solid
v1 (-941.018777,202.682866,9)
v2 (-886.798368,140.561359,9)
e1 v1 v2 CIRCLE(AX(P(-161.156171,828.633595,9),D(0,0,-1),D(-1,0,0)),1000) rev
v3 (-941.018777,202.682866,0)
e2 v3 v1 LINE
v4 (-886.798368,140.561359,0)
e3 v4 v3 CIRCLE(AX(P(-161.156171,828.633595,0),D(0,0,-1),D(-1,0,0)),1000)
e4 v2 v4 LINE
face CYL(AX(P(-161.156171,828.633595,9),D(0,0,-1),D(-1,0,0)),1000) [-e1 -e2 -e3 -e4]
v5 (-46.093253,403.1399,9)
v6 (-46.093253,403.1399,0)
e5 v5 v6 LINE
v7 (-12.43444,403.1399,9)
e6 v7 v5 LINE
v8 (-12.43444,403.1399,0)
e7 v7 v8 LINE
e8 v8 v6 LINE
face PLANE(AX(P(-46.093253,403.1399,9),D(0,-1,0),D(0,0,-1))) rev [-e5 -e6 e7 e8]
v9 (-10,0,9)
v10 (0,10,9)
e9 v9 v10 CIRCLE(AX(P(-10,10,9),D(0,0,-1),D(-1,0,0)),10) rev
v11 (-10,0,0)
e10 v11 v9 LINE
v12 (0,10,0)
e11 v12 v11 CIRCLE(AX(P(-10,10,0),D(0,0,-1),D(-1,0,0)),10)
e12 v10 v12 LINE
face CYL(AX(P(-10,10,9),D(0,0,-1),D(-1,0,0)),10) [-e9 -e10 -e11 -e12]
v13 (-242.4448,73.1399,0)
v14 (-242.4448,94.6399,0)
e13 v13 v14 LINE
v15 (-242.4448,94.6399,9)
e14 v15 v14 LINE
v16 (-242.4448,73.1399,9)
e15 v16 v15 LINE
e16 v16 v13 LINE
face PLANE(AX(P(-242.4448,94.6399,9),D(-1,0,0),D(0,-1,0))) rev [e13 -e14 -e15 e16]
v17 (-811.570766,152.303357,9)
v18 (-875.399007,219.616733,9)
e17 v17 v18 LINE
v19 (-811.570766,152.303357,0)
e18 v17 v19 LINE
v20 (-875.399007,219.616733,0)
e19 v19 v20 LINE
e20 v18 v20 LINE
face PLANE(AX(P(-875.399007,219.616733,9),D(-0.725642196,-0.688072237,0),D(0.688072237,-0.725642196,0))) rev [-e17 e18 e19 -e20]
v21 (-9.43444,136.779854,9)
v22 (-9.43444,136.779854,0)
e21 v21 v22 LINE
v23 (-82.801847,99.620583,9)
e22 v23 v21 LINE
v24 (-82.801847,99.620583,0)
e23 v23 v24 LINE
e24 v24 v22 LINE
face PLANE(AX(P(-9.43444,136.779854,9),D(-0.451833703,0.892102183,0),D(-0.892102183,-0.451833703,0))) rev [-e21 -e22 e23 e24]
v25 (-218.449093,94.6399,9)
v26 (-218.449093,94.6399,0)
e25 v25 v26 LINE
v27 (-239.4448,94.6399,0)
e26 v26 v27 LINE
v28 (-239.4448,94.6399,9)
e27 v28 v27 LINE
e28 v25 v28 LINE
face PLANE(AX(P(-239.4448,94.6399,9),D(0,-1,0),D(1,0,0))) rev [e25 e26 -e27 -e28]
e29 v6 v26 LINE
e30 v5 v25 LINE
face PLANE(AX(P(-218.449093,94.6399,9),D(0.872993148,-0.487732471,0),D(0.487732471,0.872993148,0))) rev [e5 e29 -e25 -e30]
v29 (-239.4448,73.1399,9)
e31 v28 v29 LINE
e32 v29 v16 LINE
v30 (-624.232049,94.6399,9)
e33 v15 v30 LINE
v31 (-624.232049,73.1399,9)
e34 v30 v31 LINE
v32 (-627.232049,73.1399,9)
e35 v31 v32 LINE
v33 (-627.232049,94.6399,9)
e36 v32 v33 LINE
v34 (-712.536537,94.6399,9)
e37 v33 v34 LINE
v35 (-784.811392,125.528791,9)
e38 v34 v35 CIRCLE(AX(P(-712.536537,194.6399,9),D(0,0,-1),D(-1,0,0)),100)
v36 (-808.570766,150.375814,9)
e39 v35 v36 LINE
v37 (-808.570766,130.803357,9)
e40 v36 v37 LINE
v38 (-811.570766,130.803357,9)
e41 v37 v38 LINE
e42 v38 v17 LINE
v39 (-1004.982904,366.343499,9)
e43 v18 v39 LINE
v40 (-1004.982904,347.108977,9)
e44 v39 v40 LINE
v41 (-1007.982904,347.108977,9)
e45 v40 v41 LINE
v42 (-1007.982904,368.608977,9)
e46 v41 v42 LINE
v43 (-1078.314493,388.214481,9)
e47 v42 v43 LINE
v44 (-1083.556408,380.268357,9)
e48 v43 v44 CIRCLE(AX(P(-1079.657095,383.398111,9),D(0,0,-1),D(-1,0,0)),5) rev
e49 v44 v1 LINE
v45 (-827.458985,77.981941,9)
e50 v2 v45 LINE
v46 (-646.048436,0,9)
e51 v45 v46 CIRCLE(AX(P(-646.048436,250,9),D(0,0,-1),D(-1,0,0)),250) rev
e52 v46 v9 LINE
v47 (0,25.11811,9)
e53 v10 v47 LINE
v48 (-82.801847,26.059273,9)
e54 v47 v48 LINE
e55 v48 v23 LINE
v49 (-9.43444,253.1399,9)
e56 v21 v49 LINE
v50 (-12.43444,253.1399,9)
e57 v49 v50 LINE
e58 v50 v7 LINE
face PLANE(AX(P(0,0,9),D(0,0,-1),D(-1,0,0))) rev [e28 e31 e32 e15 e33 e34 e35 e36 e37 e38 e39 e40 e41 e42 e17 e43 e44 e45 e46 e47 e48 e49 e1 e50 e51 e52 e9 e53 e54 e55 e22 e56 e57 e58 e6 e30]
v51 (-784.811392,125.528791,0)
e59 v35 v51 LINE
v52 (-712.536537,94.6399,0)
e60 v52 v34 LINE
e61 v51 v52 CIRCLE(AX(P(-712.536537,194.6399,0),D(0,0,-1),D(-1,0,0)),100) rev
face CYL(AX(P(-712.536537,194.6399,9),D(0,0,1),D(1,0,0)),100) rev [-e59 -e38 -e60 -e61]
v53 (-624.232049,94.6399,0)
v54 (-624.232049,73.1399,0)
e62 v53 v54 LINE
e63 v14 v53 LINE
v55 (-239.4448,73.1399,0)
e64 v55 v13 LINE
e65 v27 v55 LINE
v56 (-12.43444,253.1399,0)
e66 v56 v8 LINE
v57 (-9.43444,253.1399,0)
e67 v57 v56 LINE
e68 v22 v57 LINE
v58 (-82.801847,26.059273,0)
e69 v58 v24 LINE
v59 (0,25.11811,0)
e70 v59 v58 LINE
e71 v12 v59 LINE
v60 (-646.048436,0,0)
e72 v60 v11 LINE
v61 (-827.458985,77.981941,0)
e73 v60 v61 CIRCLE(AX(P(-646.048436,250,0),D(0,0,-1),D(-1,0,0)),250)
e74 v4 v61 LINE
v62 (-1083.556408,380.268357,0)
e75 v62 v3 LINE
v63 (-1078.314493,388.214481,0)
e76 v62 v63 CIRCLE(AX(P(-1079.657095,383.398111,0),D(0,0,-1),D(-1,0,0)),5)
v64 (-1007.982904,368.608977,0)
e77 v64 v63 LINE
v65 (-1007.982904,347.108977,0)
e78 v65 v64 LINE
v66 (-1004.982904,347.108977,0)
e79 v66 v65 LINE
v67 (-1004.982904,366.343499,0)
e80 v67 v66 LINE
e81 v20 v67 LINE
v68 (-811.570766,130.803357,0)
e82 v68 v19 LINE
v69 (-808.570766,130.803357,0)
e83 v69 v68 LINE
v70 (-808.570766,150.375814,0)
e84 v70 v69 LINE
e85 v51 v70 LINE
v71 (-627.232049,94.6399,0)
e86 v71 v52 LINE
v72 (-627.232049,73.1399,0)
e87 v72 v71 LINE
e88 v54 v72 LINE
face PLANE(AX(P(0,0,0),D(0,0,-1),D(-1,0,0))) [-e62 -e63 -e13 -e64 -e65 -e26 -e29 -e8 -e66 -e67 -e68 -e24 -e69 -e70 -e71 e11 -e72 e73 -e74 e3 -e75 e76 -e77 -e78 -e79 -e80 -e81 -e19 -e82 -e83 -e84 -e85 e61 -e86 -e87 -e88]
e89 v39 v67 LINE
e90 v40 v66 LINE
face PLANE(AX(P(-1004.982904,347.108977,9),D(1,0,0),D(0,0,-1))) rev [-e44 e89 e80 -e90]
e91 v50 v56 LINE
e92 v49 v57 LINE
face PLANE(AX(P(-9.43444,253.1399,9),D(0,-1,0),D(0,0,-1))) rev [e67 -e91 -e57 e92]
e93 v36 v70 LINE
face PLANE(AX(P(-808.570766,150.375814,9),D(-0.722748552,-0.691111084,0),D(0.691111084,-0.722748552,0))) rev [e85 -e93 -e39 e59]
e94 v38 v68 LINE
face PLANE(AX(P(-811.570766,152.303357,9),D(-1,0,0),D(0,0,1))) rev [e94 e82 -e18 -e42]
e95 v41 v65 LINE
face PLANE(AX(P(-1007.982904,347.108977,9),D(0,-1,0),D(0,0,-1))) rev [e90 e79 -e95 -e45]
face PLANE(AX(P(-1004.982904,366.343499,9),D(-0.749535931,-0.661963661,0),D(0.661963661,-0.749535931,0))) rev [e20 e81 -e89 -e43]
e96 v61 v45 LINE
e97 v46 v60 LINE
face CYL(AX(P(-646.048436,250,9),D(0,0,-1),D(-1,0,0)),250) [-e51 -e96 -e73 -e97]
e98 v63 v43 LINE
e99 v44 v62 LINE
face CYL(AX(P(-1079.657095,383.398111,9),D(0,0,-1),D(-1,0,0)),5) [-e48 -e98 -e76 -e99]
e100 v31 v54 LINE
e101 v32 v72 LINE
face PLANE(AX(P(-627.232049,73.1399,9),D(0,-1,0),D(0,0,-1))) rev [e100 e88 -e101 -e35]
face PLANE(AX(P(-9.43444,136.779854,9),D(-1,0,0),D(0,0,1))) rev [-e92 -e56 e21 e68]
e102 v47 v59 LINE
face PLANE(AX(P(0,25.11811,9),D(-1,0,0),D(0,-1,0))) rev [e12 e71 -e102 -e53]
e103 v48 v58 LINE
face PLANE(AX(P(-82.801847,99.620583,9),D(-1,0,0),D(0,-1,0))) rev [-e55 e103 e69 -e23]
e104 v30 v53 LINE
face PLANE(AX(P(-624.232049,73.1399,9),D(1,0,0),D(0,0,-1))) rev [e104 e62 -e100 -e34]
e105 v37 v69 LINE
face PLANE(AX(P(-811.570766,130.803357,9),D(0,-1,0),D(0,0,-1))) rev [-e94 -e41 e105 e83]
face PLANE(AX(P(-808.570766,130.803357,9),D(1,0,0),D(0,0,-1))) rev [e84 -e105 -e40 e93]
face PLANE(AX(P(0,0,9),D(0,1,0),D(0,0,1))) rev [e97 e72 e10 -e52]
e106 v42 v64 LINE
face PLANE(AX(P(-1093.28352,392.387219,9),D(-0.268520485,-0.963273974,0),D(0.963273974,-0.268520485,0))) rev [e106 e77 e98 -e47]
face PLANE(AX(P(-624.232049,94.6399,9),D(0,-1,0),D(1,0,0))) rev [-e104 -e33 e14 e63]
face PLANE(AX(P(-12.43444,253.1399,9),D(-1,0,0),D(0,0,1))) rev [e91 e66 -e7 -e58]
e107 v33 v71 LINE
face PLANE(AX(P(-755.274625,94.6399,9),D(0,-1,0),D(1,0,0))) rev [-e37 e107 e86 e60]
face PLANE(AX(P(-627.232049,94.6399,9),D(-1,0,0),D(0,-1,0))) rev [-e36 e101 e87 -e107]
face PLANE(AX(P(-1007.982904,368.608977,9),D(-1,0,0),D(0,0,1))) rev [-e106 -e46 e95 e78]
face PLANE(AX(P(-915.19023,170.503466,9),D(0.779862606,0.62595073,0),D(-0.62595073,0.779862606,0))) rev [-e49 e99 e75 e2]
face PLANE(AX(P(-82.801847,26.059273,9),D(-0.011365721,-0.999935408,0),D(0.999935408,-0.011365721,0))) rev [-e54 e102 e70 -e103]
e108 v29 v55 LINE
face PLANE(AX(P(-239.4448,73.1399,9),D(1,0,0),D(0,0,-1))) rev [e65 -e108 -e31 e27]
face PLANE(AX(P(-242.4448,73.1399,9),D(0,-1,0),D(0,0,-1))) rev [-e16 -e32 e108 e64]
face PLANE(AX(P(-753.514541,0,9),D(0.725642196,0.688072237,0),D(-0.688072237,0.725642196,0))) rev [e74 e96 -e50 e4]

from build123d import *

# Parameters (mm, degrees)
BOSS_EXTRU_1_DEPTH = 9
CONG_1_R           = 1000
CONG_2_R           = 250
CONG_4_R           = 10
CONG_5_R           = 5
CONG_6_R           = 100


with BuildPart() as part:
    # Esquisse2 → Boss.-Extru.1 (new body)
    with BuildSketch(Plane.XY):
        Polygon((0, 0), (-753.514541491, 0), (-915.190229508, 170.50346618), (-1093.283519558, 392.387219436), (-1007.982904338, 368.608976512), (-1007.982904338, 347.108976512), (-1004.982904338, 347.108976512), (-1004.982904338, 366.343498655), (-875.399006988, 219.616732713), (-811.570765603, 152.303356597), (-811.570765603, 130.803356597), (-808.570765603, 130.803356597), (-808.570765603, 150.375814407), (-755.274625166, 94.639899826), (-627.232048759, 94.639899826), (-627.232048759, 73.139899826), (-624.232048759, 73.139899826), (-624.232048759, 94.639899826), (-242.444799847, 94.639899826), (-242.444799847, 73.139899826), (-239.444799847, 73.139899826), (-239.444799847, 94.639899826), (-218.449092799, 94.639899826), (-46.093252688, 403.139899826), (-12.434439882, 403.139899826), (-12.434439882, 253.139899826), (-9.434439882, 253.139899826), (-9.434439882, 136.779854294), (-82.801847324, 99.620582608), (-82.801847324, 26.059273195), (0, 25.118109707), align=None)
    extrude(amount=BOSS_EXTRU_1_DEPTH)

    # Congé1
    # the kernel refuses this fillet: 1000 mm, written as the material it takes off along each edge
    with BuildSketch(Plane(origin=(-915.190229508, 170.50346618, -103.157271439), x_dir=(0.6880722367162745, -0.7256421963063223, 0), z_dir=(0, 0, 1))) as cong_1_piece_1:
        with BuildLine():
            CenterArc((CONG_1_R * 0.0412629085755, CONG_1_R), CONG_1_R, 265.274299796, 4.725700204)
            Line((-CONG_1_R * 0.0411226366703, CONG_1_R * 0.00339946722142), (0, 0))
            Line((0, 0), (CONG_1_R * 0.0412629085755, 0))
        make_face()
    extrude(amount=215.314542878, mode=Mode.SUBTRACT)

    # Congé2
    cong_2_edges = [part.edges().sort_by_distance(p)[0] for p in [
        (-753.514541491, 0, 4.5),
    ]]
    fillet(cong_2_edges, radius=CONG_2_R)

    # Congé4
    cong_4_edges = [part.edges().sort_by_distance(p)[0] for p in [
        (0, 0, 4.5),
    ]]
    fillet(cong_4_edges, radius=CONG_4_R)

    # Congé5
    cong_5_edges = [part.edges().sort_by_distance(p)[0] for p in [
        (-1093.283519558, 392.387219436, 4.5),
    ]]
    fillet(cong_5_edges, radius=CONG_5_R)

    # Congé6
    cong_6_edges = [part.edges().sort_by_distance(p)[0] for p in [
        (-755.274625166, 94.639899826, 4.5),
    ]]
    fillet(cong_6_edges, radius=CONG_6_R)


solid = part.part
